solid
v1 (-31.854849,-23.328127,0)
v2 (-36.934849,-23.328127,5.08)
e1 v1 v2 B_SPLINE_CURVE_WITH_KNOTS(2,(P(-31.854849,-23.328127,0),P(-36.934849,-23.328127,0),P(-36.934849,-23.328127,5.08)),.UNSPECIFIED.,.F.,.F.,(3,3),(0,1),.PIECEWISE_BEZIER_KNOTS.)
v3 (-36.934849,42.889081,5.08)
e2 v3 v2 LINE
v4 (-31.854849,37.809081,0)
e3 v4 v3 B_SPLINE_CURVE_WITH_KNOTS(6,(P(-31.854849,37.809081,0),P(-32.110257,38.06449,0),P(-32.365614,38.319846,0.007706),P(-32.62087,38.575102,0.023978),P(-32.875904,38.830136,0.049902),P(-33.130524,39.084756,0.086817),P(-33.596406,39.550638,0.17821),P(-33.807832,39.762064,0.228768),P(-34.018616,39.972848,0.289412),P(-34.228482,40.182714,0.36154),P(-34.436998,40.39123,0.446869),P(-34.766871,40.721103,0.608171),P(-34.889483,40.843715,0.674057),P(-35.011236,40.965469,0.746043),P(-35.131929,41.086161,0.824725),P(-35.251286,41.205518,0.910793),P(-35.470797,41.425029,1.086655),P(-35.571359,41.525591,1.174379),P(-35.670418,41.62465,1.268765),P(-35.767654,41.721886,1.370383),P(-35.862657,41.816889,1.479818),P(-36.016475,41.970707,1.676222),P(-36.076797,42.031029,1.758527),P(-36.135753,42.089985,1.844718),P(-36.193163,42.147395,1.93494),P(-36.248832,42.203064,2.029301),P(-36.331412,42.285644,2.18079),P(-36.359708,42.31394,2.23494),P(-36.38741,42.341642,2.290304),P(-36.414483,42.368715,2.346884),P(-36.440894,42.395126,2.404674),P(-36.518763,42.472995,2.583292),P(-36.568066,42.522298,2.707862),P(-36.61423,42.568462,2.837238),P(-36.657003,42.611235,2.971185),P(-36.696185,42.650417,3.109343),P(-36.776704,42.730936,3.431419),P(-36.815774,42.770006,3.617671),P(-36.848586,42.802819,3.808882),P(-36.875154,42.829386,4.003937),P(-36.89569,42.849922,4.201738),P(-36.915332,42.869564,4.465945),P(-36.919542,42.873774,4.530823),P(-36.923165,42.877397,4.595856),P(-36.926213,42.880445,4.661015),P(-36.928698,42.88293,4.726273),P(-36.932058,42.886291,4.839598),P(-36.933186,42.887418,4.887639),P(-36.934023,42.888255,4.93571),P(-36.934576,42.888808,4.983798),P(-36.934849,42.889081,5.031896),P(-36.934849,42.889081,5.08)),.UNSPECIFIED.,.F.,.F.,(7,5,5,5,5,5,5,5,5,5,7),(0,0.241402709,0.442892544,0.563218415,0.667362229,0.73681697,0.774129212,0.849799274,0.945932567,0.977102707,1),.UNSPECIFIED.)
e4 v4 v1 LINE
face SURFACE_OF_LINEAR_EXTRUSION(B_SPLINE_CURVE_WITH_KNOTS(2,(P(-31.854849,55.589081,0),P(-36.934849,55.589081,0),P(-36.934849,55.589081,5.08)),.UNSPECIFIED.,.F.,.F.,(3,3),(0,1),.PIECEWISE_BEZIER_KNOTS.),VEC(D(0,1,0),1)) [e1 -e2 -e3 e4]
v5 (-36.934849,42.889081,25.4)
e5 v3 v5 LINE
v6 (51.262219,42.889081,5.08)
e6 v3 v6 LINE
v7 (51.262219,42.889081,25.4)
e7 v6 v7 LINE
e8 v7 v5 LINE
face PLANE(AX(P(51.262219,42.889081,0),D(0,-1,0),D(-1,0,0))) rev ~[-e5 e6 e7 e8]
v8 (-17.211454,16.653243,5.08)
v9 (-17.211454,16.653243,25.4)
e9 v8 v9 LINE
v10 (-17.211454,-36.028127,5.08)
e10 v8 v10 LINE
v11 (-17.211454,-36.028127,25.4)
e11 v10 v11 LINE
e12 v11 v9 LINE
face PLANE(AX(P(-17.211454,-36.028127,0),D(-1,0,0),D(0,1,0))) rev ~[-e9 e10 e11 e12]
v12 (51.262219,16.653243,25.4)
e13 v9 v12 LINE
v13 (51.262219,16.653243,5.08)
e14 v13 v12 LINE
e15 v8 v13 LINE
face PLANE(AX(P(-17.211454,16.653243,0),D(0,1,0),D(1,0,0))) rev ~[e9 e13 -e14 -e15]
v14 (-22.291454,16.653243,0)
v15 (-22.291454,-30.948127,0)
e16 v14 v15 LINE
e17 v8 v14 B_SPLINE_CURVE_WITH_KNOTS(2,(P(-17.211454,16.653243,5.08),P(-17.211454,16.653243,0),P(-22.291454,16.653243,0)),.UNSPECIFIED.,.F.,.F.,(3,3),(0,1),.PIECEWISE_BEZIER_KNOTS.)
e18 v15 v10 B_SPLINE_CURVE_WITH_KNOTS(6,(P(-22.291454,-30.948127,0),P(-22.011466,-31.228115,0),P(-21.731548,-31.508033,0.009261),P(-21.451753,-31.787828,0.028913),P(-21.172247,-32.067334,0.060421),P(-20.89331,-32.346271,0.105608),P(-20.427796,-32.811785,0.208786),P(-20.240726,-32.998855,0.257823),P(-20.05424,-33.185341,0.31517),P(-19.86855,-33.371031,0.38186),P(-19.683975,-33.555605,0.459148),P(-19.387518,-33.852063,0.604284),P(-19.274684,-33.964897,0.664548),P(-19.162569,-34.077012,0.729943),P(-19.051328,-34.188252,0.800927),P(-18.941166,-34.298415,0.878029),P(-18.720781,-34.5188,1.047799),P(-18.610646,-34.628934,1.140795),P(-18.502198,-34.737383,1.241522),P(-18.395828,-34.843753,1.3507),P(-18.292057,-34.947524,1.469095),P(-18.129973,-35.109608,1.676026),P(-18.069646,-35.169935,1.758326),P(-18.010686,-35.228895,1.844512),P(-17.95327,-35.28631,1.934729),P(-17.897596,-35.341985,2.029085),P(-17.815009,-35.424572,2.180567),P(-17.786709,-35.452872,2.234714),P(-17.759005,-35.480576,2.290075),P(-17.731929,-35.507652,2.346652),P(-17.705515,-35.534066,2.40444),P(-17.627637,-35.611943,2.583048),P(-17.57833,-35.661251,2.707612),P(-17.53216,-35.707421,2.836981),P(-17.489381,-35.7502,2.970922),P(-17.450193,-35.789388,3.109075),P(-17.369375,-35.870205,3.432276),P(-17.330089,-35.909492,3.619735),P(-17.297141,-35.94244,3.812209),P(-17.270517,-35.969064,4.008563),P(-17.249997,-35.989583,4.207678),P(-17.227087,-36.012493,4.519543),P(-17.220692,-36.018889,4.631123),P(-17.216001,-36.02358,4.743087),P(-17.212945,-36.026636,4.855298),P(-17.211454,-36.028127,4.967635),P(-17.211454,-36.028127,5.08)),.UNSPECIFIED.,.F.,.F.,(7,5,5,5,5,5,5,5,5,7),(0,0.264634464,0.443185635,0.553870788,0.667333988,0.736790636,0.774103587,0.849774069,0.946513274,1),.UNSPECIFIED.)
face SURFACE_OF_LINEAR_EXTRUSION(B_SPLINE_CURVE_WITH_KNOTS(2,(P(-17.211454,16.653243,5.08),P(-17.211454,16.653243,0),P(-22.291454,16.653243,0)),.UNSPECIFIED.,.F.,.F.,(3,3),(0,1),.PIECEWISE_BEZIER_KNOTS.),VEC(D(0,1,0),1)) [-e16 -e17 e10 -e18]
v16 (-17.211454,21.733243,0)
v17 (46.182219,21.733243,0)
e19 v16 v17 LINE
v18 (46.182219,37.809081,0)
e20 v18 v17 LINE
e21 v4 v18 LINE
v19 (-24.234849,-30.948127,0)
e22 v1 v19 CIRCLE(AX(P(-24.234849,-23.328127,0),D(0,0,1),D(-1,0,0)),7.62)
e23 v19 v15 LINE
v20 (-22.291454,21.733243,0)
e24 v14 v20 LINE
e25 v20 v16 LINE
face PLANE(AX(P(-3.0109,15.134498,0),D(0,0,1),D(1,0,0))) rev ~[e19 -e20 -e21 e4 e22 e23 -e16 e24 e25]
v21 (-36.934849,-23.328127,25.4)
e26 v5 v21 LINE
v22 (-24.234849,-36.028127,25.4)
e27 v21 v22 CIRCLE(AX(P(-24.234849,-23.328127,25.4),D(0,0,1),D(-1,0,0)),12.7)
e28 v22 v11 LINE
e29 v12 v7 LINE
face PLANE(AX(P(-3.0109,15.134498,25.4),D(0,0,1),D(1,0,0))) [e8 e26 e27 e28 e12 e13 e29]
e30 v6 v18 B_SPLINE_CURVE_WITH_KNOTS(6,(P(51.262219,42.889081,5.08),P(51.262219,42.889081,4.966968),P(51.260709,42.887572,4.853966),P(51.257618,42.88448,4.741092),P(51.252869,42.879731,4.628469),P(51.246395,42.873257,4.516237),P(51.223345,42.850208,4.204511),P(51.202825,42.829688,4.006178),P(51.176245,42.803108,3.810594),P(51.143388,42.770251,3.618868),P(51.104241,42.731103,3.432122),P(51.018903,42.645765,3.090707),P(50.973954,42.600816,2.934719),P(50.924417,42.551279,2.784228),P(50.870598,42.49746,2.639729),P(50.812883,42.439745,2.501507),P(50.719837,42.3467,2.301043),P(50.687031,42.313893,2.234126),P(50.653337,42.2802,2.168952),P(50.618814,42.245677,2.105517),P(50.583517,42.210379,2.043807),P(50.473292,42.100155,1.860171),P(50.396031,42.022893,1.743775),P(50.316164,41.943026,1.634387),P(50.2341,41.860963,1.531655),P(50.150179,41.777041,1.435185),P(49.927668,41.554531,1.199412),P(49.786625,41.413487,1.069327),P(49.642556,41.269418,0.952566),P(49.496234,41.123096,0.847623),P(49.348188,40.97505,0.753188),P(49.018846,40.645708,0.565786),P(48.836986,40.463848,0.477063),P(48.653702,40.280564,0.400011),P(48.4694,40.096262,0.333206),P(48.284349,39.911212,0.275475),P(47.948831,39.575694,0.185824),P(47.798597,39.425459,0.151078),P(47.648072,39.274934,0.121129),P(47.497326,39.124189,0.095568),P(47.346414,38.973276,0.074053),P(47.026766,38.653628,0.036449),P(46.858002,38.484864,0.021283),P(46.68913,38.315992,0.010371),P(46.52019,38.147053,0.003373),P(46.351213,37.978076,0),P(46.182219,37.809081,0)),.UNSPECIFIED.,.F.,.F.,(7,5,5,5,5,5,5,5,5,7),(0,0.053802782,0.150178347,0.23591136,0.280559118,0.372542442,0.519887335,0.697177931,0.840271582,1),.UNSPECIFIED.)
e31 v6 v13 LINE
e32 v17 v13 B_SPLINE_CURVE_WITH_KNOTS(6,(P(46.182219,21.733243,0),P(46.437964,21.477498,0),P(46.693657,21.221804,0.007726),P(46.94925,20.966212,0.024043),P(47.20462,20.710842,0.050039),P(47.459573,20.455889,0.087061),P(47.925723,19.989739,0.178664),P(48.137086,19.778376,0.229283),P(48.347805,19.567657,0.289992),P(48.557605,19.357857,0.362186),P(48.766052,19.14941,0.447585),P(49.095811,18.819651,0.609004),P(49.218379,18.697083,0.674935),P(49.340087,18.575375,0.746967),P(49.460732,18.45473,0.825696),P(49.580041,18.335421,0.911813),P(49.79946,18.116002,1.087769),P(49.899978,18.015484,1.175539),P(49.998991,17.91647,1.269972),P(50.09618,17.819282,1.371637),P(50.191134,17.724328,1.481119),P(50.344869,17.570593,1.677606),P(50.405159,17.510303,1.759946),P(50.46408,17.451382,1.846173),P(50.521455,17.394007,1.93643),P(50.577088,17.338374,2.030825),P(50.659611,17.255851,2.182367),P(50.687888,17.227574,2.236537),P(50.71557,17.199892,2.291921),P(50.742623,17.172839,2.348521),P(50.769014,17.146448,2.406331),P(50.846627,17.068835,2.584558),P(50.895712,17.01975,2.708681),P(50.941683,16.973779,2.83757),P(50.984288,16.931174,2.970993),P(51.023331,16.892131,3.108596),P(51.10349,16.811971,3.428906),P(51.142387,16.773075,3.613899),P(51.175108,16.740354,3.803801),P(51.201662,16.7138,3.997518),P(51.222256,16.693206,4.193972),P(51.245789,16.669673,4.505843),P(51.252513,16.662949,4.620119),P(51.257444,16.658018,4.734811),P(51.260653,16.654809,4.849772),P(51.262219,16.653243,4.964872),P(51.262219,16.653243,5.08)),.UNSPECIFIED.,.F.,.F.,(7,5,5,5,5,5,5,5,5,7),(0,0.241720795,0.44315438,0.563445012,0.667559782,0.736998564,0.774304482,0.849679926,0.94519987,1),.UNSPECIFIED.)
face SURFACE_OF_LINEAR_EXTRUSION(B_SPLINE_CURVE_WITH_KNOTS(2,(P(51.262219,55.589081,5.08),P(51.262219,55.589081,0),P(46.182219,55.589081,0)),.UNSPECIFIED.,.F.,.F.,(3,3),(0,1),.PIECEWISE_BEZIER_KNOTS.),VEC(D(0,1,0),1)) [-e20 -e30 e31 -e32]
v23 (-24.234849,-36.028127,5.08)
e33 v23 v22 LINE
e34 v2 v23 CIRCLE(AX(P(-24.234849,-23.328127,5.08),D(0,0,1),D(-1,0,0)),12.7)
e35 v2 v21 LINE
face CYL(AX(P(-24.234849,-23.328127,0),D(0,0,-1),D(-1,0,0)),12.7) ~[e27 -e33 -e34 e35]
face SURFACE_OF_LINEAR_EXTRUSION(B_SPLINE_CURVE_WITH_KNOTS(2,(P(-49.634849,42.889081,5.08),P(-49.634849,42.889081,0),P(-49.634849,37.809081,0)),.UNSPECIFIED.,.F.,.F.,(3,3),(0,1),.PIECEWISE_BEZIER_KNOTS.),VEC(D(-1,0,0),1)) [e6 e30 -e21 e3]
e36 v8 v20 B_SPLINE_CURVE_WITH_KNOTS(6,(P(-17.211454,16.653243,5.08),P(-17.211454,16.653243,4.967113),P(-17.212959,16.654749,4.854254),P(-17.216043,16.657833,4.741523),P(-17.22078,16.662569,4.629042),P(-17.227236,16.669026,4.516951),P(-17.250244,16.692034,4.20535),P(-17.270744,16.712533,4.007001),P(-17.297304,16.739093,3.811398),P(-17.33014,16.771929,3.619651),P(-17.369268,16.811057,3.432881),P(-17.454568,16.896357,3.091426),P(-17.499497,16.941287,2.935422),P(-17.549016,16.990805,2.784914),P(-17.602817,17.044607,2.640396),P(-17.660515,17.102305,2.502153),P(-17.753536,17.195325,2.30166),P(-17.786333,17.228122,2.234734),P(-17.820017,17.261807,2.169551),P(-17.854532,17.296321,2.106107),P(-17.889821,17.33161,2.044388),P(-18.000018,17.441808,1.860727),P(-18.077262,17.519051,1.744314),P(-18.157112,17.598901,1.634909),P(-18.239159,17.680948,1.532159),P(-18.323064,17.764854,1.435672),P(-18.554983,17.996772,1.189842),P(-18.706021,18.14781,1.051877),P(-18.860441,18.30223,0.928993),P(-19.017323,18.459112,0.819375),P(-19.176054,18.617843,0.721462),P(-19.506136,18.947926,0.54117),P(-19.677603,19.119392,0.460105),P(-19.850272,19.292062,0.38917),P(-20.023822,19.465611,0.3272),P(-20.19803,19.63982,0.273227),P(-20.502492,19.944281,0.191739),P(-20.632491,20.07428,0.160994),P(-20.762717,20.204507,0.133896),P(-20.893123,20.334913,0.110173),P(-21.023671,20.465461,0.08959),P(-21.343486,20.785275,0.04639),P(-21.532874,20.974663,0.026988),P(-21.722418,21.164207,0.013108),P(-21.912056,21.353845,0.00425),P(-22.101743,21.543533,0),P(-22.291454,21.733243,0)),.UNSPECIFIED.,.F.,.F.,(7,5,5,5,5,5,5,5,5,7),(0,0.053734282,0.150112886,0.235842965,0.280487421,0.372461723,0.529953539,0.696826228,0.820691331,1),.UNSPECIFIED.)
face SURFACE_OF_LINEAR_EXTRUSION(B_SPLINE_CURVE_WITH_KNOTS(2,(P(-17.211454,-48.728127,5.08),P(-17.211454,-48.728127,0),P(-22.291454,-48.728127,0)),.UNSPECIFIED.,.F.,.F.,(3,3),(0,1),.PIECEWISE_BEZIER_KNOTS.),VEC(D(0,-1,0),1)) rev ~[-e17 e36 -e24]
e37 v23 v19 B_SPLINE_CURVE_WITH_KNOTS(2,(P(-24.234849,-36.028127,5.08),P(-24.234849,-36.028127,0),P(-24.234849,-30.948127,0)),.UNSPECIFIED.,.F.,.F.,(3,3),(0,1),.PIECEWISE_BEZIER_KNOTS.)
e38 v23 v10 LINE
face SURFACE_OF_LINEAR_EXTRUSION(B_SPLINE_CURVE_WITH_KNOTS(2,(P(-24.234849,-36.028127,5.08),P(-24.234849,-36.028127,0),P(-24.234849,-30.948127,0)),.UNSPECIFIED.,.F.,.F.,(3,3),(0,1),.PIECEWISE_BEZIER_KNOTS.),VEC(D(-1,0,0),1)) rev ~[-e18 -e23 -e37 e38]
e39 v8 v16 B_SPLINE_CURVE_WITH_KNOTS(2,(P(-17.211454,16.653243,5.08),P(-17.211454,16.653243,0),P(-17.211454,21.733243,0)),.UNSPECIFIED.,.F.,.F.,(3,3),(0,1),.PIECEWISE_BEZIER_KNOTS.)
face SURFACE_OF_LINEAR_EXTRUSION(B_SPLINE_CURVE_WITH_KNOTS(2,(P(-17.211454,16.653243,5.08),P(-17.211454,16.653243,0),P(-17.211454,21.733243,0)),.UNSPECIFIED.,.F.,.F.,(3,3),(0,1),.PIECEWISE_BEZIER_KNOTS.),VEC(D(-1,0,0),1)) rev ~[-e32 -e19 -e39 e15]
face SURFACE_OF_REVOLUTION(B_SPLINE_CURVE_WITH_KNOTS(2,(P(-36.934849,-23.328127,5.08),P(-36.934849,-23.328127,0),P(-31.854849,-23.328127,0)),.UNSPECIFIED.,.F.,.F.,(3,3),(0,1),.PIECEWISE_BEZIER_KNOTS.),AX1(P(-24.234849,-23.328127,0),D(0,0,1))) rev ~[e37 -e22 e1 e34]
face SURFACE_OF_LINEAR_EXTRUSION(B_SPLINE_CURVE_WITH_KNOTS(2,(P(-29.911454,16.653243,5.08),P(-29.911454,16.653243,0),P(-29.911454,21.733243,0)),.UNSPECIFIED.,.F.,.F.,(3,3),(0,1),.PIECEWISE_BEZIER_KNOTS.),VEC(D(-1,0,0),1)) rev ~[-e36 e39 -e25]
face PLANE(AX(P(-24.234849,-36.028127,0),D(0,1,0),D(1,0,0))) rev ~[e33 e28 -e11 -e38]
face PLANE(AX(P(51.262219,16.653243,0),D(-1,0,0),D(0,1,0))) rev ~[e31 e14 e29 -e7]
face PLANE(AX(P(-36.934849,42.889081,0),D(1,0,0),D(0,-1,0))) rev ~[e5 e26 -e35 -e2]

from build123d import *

# Parameters (mm, degrees)
F1_DEPTH     = 25.4
F2_T1_DEPTH  = 78.9172077388
F2_T3_DEPTH  = 19.7233948857
F2_T5_DEPTH  = 65.3813702494
F2_T7_DEPTH  = 81.1736724943
F2_T9_DEPTH  = 51.6358374894
F2_T11_DEPTH = 113.59706738
F2_T14_ANGLE = 90
F2_T19_DEPTH = 93.8736724943
F2_T23_DEPTH = 78.0813702494


# Not quite as in the source:
# - a fillet or chamfer that OpenCascade refuses, or shapes differently, is made with other operations: its cross-section is extruded or revolved along the edge and cut away or added


with BuildPart() as f1:
    # F0 (on Top) → F1 (new body)
    with BuildSketch(Plane.XY):
        with BuildLine():
            Line((-17.2114539891, 42.8890809417), (-36.9348488748, 42.8890809417))
            Line((-36.9348488748, 42.8890809417), (-36.9348488748, 16.6532434523))
            Line((-36.9348488748, 16.6532434523), (-36.9348488748, -23.3281267971))
            ThreePointArc((-36.9348488748, -23.3281267971), (-33.2151049959, -32.3083829181), (-24.2348488748, -36.0281267971))
            Line((-24.2348488748, -36.0281267971), (-17.2114539891, -36.0281267971))
            Line((-17.2114539891, -36.0281267971), (-17.2114539891, 16.6532434523))
            Line((-17.2114539891, 16.6532434523), (51.2622185051, 16.6532434523))
            Line((51.2622185051, 16.6532434523), (51.2622185051, 42.8890809417))
            Line((51.2622185051, 42.8890809417), (-17.2114539891, 42.8890809417))
        make_face()
    extrude(amount=F1_DEPTH)

    # F2: fillet of radius 5.08 on 7 edges, made by hand

    # F2_s2 → F2_t1 (cut)
    with BuildSketch(Plane.XZ.offset(-55.5890809417)):
        with BuildLine():
            add(Edge.make_bspline(
                [(-31.8548488748, 0), (-36.9348488748, 0), (-36.9348488748, 5.08)],
                knots=[0, 0, 0, 1, 1, 1], degree=2, weights=[1, 1, 1]))
            Line((-36.9348488748, 5.08), (-36.9348488748, 0))
            Line((-36.9348488748, 0), (-31.8548488748, 0))
        make_face()
    extrude(amount=F2_T1_DEPTH, mode=Mode.SUBTRACT)

    # F2_s4 → F2_t3 (cut)
    with BuildSketch(Plane.YZ.offset(-24.2348488748)):
        with BuildLine():
            add(Edge.make_bspline(
                [(-36.0281267971, 5.08), (-36.0281267971, 0), (-30.9481267971, 0)],
                knots=[0, 0, 0, 1, 1, 1], degree=2, weights=[1, 1, 1]))
            Line((-30.9481267971, 0), (-36.0281267971, 0))
            Line((-36.0281267971, 0), (-36.0281267971, 5.08))
        make_face()
    extrude(amount=F2_T3_DEPTH, mode=Mode.SUBTRACT)

    # F2_s6 → F2_t5 (cut)
    with BuildSketch(Plane.XZ.offset(-16.6532434523)):
        with BuildLine():
            add(Edge.make_bspline(
                [(-17.2114539891, 5.08), (-17.2114539891, 0), (-22.2914539891, 0)],
                knots=[0, 0, 0, 1, 1, 1], degree=2, weights=[1, 1, 1]))
            Line((-22.2914539891, 0), (-17.2114539891, 0))
            Line((-17.2114539891, 0), (-17.2114539891, 5.08))
        make_face()
    extrude(amount=F2_T5_DEPTH, mode=Mode.SUBTRACT)

    # F2_s8 → F2_t7 (cut)
    with BuildSketch(Plane.YZ.offset(-17.2114539891)):
        with BuildLine():
            add(Edge.make_bspline(
                [(16.6532434523, 5.08), (16.6532434523, 0), (21.7332434523, 0)],
                knots=[0, 0, 0, 1, 1, 1], degree=2, weights=[1, 1, 1]))
            Line((21.7332434523, 0), (16.6532434523, 0))
            Line((16.6532434523, 0), (16.6532434523, 5.08))
        make_face()
    extrude(amount=F2_T7_DEPTH, mode=Mode.SUBTRACT)

    # F2_s10 → F2_t9 (cut)
    with BuildSketch(Plane.XZ.offset(-55.5890809417)):
        with BuildLine():
            add(Edge.make_bspline(
                [(51.2622185051, 5.08), (51.2622185051, 0), (46.1822185051, 0)],
                knots=[0, 0, 0, 1, 1, 1], degree=2, weights=[1, 1, 1]))
            Line((46.1822185051, 0), (51.2622185051, 0))
            Line((51.2622185051, 0), (51.2622185051, 5.08))
        make_face()
    extrude(amount=F2_T9_DEPTH, mode=Mode.SUBTRACT)

    # F2_s12 → F2_t11 (cut)
    with BuildSketch(Plane.YZ.offset(-49.6348488748)):
        with BuildLine():
            add(Edge.make_bspline(
                [(42.8890809417, 5.08), (42.8890809417, 0), (37.8090809417, 0)],
                knots=[0, 0, 0, 1, 1, 1], degree=2, weights=[1, 1, 1]))
            Line((37.8090809417, 0), (42.8890809417, 0))
            Line((42.8890809417, 0), (42.8890809417, 5.08))
        make_face()
    extrude(amount=F2_T11_DEPTH, mode=Mode.SUBTRACT)

    # F2_s13 → F2_t14 (revolve, cut)
    with BuildSketch(Plane.XZ.offset(23.3281267971)):
        with BuildLine():
            add(Edge.make_bspline(
                [(-36.9348488748, 5.08), (-36.9348488748, 0), (-31.8548488748, 0)],
                knots=[0, 0, 0, 1, 1, 1], degree=2, weights=[1, 1, 1]))
            Line((-31.8548488748, 0), (-36.9348488748, 0))
            Line((-36.9348488748, 0), (-36.9348488748, 5.08))
        make_face()
    revolve(axis=Axis((-24.2348488748, -23.3281267971, 0), (0, 0, 1)), revolution_arc=F2_T14_ANGLE, mode=Mode.SUBTRACT)


with BuildPart() as f2_tool17:
    # F2_s18 → F2_t19 (new body)
    with BuildSketch(Plane.YZ.offset(-29.9114539891)):
        with BuildLine():
            add(Edge.make_bspline(
                [(16.6532434523, 5.08), (16.6532434523, 0), (21.7332434523, 0)],
                knots=[0, 0, 0, 1, 1, 1], degree=2, weights=[1, 1, 1]))
            Line((21.7332434523, 0), (16.6532434523, 0))
            Line((16.6532434523, 0), (16.6532434523, 5.08))
        make_face()
    extrude(amount=F2_T19_DEPTH)

    split(bisect_by=Plane.YZ.offset(-17.2114539891), keep=Keep.BOTTOM)


with BuildPart() as f2_tool21:
    # F2_s22 → F2_t23 (new body)
    with BuildSketch(Plane.XZ.offset(48.7281267971)):
        with BuildLine():
            add(Edge.make_bspline(
                [(-17.2114539891, 5.08), (-17.2114539891, 0), (-22.2914539891, 0)],
                knots=[0, 0, 0, 1, 1, 1], degree=2, weights=[1, 1, 1]))
            Line((-22.2914539891, 0), (-17.2114539891, 0))
            Line((-17.2114539891, 0), (-17.2114539891, 5.08))
        make_face()
    extrude(amount=-F2_T23_DEPTH)

    split(bisect_by=Plane.XZ.offset(-16.6532434523), keep=Keep.BOTTOM)


with BuildPart() as f2_tool17_1:
    add(f2_tool17.part)

    # F2_t25: intersect F2_tool21
    add(f2_tool21.part, mode=Mode.INTERSECT)


with BuildPart() as f1_1:
    add(f1.part)

    # F2_t15: cut F2_tool17
    add(f2_tool17_1.part, mode=Mode.SUBTRACT)


solid = f1_1.part
